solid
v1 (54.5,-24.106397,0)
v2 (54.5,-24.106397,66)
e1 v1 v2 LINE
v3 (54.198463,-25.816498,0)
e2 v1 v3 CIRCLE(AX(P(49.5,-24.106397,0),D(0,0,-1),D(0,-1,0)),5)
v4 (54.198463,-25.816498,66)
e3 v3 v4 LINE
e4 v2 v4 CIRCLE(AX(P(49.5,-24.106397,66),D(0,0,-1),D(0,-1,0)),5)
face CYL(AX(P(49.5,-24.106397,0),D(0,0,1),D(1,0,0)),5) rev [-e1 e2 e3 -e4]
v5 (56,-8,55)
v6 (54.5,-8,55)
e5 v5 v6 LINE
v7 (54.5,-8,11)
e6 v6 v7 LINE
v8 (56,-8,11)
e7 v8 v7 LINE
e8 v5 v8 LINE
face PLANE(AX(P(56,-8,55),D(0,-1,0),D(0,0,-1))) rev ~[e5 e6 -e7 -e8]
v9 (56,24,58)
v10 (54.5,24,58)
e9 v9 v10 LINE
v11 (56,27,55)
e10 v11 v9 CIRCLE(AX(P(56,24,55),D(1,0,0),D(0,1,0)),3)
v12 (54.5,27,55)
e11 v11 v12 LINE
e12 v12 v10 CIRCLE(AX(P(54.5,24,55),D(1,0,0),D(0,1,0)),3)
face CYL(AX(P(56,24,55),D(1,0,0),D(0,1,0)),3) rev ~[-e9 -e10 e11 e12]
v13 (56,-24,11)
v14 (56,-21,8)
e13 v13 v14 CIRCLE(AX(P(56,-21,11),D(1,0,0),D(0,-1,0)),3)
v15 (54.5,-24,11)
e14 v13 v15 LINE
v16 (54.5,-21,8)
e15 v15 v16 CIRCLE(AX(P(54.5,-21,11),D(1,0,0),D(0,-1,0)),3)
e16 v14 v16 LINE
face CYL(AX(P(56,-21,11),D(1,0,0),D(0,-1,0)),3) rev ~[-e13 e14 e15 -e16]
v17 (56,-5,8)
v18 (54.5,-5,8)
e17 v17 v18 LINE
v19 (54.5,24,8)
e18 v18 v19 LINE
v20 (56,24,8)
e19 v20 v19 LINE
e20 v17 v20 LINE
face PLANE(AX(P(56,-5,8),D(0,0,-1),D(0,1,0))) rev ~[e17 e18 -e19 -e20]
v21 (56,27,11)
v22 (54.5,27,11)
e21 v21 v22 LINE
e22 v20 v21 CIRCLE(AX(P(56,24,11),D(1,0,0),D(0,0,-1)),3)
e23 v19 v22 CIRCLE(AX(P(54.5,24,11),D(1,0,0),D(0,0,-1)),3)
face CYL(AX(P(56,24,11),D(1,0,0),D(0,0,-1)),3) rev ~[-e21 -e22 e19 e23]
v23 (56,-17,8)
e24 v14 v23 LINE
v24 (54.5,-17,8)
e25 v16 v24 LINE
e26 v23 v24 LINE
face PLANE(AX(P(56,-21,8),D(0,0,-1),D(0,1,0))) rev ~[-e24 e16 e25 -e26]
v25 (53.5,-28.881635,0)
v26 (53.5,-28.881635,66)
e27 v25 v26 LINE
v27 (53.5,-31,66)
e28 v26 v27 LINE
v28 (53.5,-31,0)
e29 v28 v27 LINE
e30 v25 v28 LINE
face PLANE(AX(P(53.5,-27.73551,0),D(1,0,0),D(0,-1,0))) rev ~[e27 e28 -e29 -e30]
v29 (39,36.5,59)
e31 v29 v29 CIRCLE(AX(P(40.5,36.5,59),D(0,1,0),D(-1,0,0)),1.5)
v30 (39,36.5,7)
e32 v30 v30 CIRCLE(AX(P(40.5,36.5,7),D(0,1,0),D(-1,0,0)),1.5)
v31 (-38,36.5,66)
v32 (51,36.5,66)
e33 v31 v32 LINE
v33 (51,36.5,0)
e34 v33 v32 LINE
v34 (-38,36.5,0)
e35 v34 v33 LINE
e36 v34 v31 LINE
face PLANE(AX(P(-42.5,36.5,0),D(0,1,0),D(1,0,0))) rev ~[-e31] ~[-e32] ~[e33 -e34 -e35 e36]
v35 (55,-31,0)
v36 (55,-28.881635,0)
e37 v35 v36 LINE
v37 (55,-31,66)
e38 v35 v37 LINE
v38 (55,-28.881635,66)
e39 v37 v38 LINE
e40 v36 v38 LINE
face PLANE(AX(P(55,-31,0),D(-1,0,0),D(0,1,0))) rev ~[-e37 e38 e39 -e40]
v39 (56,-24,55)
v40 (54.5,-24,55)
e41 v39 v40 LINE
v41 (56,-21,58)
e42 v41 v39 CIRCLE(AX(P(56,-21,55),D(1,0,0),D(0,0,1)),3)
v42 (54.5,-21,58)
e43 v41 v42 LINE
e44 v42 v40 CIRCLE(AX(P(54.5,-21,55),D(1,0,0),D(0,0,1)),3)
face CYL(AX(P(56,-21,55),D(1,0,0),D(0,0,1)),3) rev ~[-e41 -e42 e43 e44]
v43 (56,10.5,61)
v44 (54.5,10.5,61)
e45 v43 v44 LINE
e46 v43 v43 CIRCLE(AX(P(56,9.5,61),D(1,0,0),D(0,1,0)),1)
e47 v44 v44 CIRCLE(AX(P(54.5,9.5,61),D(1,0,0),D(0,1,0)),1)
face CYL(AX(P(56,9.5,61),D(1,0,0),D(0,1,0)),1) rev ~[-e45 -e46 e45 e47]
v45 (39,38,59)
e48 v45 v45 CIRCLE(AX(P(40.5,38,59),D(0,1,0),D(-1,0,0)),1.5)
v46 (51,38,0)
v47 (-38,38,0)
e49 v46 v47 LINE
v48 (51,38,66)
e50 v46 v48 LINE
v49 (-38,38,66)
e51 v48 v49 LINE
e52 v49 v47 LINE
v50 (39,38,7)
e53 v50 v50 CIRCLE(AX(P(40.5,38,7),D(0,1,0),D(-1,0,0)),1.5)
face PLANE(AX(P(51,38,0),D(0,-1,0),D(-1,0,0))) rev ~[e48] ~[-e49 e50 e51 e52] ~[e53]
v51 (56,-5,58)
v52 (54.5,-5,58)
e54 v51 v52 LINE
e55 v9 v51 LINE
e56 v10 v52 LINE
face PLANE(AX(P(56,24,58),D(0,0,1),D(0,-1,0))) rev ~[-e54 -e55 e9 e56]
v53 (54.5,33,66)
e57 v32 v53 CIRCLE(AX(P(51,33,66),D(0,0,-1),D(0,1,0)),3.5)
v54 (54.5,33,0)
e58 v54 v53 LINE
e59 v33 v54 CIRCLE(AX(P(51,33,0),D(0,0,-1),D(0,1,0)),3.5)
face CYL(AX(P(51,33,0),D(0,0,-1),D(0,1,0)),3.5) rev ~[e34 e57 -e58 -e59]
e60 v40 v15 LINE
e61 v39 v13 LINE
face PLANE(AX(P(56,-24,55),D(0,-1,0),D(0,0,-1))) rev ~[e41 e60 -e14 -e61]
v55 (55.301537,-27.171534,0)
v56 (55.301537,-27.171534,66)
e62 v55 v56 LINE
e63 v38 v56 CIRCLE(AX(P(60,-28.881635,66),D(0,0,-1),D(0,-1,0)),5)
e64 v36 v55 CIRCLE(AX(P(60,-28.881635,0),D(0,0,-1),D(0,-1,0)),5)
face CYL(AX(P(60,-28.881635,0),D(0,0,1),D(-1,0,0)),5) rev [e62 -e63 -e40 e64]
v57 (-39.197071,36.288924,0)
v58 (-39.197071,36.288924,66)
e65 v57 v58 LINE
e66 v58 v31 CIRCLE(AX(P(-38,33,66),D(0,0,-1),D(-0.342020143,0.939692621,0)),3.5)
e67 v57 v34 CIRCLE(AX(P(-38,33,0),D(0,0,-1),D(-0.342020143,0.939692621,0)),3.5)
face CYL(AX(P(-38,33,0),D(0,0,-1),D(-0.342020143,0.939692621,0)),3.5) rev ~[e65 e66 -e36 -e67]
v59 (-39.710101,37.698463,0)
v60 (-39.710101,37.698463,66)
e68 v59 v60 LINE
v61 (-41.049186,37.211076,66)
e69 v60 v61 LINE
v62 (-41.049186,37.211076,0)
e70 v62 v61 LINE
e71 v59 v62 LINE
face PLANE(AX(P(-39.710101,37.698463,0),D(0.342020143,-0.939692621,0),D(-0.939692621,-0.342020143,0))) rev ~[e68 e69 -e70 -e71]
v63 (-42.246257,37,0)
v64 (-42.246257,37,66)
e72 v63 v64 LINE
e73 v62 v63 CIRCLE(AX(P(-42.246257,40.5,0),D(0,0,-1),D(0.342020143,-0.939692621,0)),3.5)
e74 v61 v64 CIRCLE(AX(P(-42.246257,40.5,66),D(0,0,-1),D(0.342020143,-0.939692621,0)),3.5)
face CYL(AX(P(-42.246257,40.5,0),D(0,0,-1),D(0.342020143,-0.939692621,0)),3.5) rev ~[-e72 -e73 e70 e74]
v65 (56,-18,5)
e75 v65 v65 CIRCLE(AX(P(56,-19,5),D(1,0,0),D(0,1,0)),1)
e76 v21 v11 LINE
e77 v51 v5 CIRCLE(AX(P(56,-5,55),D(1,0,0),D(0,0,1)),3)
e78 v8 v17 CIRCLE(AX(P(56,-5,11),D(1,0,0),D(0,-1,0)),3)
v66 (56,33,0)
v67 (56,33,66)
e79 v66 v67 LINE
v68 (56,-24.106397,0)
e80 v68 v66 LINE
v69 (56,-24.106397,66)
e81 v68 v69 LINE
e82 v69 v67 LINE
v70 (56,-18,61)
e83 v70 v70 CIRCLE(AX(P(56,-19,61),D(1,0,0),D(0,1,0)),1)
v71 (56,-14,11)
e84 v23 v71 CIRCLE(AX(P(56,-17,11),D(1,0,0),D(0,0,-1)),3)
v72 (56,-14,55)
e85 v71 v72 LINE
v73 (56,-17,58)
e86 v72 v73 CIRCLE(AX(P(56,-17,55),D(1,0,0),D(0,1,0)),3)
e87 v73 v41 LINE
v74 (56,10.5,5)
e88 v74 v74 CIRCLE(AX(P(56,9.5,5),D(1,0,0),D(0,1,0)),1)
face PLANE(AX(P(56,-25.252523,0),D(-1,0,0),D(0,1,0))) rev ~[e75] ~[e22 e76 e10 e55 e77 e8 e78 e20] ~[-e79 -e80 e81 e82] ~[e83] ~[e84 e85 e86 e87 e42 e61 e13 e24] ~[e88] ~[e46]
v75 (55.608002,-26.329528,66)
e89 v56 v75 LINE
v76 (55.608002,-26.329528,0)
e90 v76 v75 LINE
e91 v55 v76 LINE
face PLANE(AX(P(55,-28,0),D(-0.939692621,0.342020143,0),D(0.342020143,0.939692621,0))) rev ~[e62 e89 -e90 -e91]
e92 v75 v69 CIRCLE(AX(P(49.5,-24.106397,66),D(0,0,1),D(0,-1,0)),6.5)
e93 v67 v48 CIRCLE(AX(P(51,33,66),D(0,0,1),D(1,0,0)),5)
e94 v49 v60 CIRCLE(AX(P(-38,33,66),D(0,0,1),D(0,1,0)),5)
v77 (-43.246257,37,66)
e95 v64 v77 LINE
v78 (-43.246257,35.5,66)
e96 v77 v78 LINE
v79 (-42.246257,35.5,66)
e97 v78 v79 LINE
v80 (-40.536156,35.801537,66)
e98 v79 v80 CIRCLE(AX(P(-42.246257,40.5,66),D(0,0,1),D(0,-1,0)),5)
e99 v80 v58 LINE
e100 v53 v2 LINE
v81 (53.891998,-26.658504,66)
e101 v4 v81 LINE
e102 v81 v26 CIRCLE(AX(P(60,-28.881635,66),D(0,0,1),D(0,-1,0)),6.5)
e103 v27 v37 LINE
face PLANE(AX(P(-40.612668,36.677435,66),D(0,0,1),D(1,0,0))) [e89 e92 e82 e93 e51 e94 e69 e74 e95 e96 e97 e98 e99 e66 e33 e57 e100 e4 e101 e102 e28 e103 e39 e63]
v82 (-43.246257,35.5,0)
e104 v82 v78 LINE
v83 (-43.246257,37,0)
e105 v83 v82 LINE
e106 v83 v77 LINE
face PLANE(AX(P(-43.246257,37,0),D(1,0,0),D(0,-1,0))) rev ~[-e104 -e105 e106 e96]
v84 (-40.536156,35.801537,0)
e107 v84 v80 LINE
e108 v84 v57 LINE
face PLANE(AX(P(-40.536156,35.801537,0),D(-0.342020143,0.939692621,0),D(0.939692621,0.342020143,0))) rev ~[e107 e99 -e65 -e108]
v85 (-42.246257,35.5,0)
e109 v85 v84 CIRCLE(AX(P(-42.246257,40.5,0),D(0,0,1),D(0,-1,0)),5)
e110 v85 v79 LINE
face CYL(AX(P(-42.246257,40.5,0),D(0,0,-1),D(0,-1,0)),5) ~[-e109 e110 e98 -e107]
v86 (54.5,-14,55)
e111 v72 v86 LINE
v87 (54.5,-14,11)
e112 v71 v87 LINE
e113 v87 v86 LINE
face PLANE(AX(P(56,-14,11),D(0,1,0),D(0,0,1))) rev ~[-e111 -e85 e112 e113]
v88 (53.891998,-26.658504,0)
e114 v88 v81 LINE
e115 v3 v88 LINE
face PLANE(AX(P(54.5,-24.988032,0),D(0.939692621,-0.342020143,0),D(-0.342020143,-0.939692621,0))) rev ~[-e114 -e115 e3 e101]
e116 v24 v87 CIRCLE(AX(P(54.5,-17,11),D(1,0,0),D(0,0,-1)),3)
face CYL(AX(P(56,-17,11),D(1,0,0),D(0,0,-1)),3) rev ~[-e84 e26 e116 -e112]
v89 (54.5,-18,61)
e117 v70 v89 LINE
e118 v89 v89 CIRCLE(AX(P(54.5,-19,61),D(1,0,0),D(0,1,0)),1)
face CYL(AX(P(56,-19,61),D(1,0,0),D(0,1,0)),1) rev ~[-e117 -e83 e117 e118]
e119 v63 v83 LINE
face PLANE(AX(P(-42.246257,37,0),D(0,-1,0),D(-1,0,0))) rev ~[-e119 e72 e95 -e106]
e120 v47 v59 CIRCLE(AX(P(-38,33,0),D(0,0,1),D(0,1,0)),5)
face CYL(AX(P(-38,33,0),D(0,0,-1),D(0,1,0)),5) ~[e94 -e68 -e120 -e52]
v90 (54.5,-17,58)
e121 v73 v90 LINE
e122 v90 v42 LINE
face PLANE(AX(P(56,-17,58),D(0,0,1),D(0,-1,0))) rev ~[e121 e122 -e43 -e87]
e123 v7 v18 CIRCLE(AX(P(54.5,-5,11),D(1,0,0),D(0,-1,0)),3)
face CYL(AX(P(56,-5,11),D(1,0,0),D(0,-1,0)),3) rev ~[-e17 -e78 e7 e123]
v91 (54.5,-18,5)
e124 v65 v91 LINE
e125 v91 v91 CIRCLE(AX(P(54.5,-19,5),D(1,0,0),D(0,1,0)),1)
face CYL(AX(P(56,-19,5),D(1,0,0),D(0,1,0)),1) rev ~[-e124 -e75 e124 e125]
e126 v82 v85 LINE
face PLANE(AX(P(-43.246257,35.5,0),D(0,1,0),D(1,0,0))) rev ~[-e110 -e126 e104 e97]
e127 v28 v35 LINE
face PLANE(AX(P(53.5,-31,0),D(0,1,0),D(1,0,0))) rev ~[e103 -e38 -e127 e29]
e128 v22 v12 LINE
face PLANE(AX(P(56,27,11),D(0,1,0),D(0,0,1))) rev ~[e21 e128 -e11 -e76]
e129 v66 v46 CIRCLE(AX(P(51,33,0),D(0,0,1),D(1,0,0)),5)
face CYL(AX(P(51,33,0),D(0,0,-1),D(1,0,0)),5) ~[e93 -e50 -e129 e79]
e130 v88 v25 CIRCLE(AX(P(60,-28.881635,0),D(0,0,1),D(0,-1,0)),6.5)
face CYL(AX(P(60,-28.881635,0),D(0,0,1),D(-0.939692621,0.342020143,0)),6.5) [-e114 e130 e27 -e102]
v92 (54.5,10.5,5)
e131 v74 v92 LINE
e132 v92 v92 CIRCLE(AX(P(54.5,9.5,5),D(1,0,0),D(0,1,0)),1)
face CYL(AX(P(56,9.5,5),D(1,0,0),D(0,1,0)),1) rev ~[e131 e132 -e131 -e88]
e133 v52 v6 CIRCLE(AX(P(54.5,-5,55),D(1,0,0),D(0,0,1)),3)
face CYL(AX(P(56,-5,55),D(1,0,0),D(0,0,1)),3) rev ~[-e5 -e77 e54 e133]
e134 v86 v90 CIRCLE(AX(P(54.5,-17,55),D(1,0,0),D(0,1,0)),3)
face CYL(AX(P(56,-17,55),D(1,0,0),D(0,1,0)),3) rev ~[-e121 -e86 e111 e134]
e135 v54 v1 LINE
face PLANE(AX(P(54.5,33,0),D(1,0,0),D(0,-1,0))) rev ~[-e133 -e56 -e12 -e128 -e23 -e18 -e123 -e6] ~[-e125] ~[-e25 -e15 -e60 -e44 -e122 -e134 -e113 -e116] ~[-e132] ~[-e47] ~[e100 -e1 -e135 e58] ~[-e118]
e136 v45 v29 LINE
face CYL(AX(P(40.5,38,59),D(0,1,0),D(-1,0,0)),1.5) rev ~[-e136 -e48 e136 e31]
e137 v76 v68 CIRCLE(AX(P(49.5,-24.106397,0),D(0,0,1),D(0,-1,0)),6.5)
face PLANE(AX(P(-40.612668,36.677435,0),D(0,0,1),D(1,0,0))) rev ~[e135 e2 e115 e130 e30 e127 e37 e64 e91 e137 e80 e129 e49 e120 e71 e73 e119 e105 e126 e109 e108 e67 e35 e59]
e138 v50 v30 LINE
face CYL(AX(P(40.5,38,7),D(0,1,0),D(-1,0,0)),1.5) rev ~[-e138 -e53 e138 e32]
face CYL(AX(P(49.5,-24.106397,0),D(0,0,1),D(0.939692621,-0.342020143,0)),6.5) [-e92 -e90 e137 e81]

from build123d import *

# Parameters (mm, degrees)
F1_DEPTH  = 66
F2_R      = 1.5
F3_DEPTH  = 25
F4_R      = 1
F5_DEPTH  = 25
F6_R      = 5
F7_R      = 6.5
F8_W      = 11.5
F8_H      = 48
F9_DEPTH  = 100
F11_DEPTH = 66


# Not quite as in the source:
# - a feature names something its author has since deleted; it is built from what else it names


with BuildPart() as f1:
    # F0 (on Top) → F1 (new body)
    with BuildSketch(Plane.XY):
        with BuildLine():
            Line((54.5, 33), (54.5, -24.9880321095))
            Line((54.5, -24.9880321095), (53.5, -27.7355095289))
            Line((53.5, -27.7355095289), (53.5, -31))
            Line((53.5, -31), (55, -31))
            Line((55, -31), (55, -28))
            Line((55, -28), (56, -25.2525225805))
            Line((56, -25.2525225805), (56, 33))
            ThreePointArc((56, 33), (54.5355339059, 36.5355339059), (51, 38))
            Line((51, 38), (-42.5, 38))
            ThreePointArc((-42.5, 38), (-46.0355339059, 36.5355339059), (-47.5, 33))
            Line((-47.5, 33), (-47.5, 0))
            Line((-47.5, 0), (-46.000000001, 0))
            Line((-46.000000001, 0), (-46.000000001, 33))
            ThreePointArc((-46.000000001, 33), (-44.9748737349, 35.4748737349), (-42.5, 36.500000001))
            Line((-42.5, 36.5), (51, 36.5))
            ThreePointArc((51, 36.5), (53.4748737342, 35.4748737342), (54.5, 33))
        make_face()
    extrude(amount=F1_DEPTH)

    # F2 (on face) → F3 (cut)
    with BuildSketch(Plane(origin=(0, 38, 0), x_dir=(-1, 0, 0), z_dir=(0, 1, 0))):
        with Locations((-40.5, 59)):
            Circle(F2_R)
        with Locations((-40.5, 7)):
            Circle(F2_R)
    extrude(amount=-F3_DEPTH, mode=Mode.SUBTRACT)

    # F4 (on face) → F5 (cut)
    with BuildSketch(Plane.YZ.offset(56)):
        with BuildLine():
            Line((-17, 58), (-21, 58))
            ThreePointArc((-21, 58), (-23.1213203436, 57.1213203436), (-24, 55))
            Line((-24, 55), (-24, 11))
            ThreePointArc((-24, 11), (-23.1213203436, 8.8786796564), (-21, 8))
            Line((-21, 8), (-17, 8))
            ThreePointArc((-17, 8), (-14.8786796564, 8.8786796564), (-14, 11))
            Line((-14, 11), (-14, 55))
            ThreePointArc((-14, 55), (-14.8786796564, 57.1213203436), (-17, 58))
        make_face()
        with BuildLine():
            Line((24, 58), (-5, 58))
            ThreePointArc((-5, 58), (-7.1213203436, 57.1213203436), (-8, 55))
            Line((-8, 55), (-8, 11))
            ThreePointArc((-8, 11), (-7.1213203436, 8.8786796564), (-5, 8))
            Line((-5, 8), (24, 8))
            ThreePointArc((24, 8), (26.1213203436, 8.8786796564), (27, 11))
            Line((27, 11), (27, 55))
            ThreePointArc((27, 55), (26.1213203436, 57.1213203436), (24, 58))
        make_face()
        with Locations((-19, 61)):
            Circle(F4_R)
        with Locations((9.5, 61)):
            Circle(F4_R)
        with Locations((9.5, 5)):
            Circle(F4_R)
        with Locations((-19, 5)):
            Circle(F4_R)
    extrude(amount=-F5_DEPTH, mode=Mode.SUBTRACT)

    # F6
    f6_edges = [f1.edges().sort_by_distance(p)[0] for p in [
        (55, -28, 33),
        (54.5, -24.988032, 33),
    ]]
    fillet(f6_edges, radius=F6_R)

    # F7
    f7_edges = [f1.edges().sort_by_distance(p)[0] for p in [
        (56, -25.252523, 33),
        (53.5, -27.73551, 33),
    ]]
    fillet(f7_edges, radius=F7_R)

    # F8 (on Top) → F9 (cut)
    with BuildSketch(Plane.XY):
        with Locations((-43.75, 19)):
            Rectangle(F8_W, F8_H)
    extrude(amount=F9_DEPTH, mode=Mode.SUBTRACT)

    # F10 (on Top) → F11 (join)
    with BuildSketch(Plane.XY):
        with BuildLine():
            Line((-43.2462567555, 37), (-43.2462567555, 35.5))
            Line((-43.2462567555, 35.5), (-42.2462567555, 35.5))
            ThreePointArc((-42.2462567555, 35.5), (-41.3780158671, 35.5759612349), (-40.5361560388, 35.8015368961))
            Line((-40.5361560388, 35.8015368961), (-39.1970705016, 36.2889241728))
            ThreePointArc((-39.1970705016, 36.2889241728), (-38.6077686218, 36.4468271355), (-38, 36.5))
            Line((-38, 36.5), (-38, 38))
            ThreePointArc((-38, 38), (-38.8682408883, 37.9240387651), (-39.7101007166, 37.6984631039))
            Line((-39.7101007166, 37.6984631039), (-41.0491862538, 37.2110758272))
            ThreePointArc((-41.0491862538, 37.2110758272), (-41.6384881336, 37.0531728645), (-42.2462567555, 37))
            Line((-42.2462567555, 37), (-43.2462567555, 37))
        make_face()
    extrude(amount=F11_DEPTH)


solid = f1.part
